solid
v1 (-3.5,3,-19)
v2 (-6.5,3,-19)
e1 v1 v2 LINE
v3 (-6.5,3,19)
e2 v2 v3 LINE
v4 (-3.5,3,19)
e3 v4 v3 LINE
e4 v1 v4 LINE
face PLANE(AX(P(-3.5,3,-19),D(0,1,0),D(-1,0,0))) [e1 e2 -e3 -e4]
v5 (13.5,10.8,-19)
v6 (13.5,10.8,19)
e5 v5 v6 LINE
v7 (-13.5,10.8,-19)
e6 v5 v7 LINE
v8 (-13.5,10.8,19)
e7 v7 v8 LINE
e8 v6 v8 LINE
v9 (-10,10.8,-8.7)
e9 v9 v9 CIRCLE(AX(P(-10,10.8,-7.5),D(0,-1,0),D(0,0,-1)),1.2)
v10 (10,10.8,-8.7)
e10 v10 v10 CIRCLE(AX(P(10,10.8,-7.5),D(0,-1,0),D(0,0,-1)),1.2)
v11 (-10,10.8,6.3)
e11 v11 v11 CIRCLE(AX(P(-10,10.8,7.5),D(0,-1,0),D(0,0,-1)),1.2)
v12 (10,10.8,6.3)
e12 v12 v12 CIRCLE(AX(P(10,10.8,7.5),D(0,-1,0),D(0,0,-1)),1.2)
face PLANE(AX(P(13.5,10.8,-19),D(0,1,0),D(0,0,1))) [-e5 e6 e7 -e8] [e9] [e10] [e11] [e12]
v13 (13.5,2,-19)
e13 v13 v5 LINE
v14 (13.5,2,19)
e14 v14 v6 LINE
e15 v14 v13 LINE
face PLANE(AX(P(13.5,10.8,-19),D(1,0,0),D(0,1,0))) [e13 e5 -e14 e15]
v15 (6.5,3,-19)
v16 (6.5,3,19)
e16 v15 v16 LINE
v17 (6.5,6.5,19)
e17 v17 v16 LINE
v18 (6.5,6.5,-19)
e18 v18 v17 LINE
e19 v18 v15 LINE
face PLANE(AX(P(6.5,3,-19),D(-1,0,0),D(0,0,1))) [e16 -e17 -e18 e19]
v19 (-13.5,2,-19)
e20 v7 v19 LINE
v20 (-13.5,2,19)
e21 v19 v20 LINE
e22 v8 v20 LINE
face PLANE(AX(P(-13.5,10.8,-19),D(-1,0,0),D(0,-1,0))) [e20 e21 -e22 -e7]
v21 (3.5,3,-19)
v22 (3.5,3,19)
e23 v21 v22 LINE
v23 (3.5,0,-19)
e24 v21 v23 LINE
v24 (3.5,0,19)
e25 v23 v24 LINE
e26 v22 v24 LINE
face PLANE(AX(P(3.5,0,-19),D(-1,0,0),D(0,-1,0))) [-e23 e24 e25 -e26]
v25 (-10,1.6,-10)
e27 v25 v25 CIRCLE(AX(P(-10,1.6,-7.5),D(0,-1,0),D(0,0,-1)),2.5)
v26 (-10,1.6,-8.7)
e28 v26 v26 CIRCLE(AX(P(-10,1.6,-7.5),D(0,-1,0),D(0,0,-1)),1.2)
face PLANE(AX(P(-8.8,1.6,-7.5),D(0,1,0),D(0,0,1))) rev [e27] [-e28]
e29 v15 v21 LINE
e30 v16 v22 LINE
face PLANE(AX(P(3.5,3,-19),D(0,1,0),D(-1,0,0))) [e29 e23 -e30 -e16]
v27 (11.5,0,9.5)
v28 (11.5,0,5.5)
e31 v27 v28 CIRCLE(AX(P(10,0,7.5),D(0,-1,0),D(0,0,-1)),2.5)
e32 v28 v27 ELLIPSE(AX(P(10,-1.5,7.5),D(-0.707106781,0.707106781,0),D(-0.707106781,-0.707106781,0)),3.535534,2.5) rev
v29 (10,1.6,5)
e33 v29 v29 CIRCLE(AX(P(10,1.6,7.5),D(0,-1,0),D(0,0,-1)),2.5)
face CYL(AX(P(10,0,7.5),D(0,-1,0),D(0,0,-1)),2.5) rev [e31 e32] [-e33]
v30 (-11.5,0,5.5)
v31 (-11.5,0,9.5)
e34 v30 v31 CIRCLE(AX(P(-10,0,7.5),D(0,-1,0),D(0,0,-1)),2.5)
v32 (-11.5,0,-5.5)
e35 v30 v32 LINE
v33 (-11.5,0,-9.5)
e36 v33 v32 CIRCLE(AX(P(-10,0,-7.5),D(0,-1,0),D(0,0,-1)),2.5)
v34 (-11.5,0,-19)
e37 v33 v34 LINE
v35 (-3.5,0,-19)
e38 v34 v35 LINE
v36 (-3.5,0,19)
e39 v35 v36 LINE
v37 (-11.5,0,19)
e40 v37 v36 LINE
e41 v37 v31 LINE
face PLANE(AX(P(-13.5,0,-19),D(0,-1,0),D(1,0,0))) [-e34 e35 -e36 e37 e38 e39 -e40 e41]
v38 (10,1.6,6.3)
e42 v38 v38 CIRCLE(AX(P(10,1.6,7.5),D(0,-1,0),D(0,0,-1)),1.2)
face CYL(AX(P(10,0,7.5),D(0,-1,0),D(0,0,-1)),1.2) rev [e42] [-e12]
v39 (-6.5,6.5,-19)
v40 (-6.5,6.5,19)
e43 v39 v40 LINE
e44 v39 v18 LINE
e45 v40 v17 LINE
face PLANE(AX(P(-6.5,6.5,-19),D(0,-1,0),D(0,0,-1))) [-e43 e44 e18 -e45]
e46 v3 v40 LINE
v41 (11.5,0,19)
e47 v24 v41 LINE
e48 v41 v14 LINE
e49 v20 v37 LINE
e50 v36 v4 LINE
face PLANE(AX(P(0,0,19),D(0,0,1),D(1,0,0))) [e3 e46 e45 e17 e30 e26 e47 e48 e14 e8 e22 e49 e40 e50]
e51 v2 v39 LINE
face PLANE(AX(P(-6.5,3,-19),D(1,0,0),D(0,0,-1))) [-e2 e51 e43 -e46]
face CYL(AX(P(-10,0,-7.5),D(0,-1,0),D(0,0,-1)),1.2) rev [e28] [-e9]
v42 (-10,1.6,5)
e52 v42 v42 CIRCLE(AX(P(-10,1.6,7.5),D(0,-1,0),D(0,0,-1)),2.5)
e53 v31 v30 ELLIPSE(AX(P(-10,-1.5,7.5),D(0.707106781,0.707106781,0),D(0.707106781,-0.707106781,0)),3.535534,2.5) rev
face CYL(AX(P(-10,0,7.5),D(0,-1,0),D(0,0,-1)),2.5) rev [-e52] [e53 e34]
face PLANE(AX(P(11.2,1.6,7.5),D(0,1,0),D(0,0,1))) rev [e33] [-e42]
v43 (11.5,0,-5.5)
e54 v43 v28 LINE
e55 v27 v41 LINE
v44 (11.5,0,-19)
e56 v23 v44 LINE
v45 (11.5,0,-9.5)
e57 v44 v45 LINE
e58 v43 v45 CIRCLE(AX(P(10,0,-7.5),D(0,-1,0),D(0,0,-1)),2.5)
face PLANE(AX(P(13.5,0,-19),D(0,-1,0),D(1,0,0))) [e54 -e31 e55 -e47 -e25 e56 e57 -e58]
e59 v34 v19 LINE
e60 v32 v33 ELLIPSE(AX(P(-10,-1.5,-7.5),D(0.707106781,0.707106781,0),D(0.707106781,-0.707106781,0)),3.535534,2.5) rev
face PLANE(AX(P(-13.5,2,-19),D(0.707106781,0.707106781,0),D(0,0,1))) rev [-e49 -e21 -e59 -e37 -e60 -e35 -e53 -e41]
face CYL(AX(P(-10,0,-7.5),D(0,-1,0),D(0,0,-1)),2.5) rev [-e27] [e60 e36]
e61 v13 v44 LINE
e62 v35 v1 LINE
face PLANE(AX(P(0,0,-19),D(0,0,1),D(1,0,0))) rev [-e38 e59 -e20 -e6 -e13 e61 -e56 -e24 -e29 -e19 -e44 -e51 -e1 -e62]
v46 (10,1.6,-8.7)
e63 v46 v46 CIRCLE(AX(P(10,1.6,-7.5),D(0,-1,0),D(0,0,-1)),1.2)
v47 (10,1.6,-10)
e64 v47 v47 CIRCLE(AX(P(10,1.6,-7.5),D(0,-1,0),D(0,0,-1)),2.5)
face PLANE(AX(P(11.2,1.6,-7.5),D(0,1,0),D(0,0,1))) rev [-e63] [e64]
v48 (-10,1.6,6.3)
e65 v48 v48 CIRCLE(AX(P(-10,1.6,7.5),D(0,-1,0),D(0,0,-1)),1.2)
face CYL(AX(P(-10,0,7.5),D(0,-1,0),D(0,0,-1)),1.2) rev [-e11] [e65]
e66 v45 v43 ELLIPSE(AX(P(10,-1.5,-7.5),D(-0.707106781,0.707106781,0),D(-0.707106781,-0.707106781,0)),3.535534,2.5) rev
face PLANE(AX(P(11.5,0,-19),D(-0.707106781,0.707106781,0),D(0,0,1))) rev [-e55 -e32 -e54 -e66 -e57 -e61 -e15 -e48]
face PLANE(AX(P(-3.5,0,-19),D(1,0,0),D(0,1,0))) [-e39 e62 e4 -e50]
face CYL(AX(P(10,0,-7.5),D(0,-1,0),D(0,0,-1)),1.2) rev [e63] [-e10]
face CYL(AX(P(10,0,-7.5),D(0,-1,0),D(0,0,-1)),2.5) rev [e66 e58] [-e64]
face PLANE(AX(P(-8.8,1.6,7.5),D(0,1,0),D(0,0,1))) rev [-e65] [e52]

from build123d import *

# Parameters (mm, degrees)
AUFSATZ_LINEAR_AUSTRAGEN1_DEPTH                      = 19
AUFSATZ_LINEAR_AUSTRAGEN1_DEPTH_BACK                 = 19
STIRNSENKUNG_F_R_M2_FLACHKOPFSCHRAUBE_MI_D           = 2.4
STIRNSENKUNG_F_R_M2_FLACHKOPFSCHRAUBE_MI_CBORE_D     = 5
STIRNSENKUNG_F_R_M2_FLACHKOPFSCHRAUBE_MI_CBORE_DEPTH = 1.6
FASE1_SIZE                                           = 2


with BuildPart() as part:
    # Skizze1 → Aufsatz-Linear austragen1 (new, two sides: drawn at the far end of the back side and taken through both)
    with BuildSketch(Plane.XY.offset(-AUFSATZ_LINEAR_AUSTRAGEN1_DEPTH_BACK)):
        Polygon((-3.5, 0), (-3.5, 3), (-6.5, 3), (-6.5, 6.5), (6.5, 6.5), (6.5, 3), (3.5, 3), (3.5, 0), (13.5, 0), (13.5, 10.8), (-13.5, 10.8), (-13.5, 0), align=None)
    extrude(amount=AUFSATZ_LINEAR_AUSTRAGEN1_DEPTH + AUFSATZ_LINEAR_AUSTRAGEN1_DEPTH_BACK)

    # Stirnsenkung für M2 Flachkopfschraube mit Schlitz1 (through all)
    with Locations(Plane(origin=(0, 0, 0), x_dir=(-1, 0, 0), z_dir=(0, -1, 0))):
        with Locations((-10, -7.5), (-10, 7.5), (10, -7.5), (10, 7.5)):
            CounterBoreHole(STIRNSENKUNG_F_R_M2_FLACHKOPFSCHRAUBE_MI_D / 2, STIRNSENKUNG_F_R_M2_FLACHKOPFSCHRAUBE_MI_CBORE_D / 2, STIRNSENKUNG_F_R_M2_FLACHKOPFSCHRAUBE_MI_CBORE_DEPTH)

    # Fase1
    # the kernel refuses this chamfer: 2 mm, written as the material it takes off along each edge
    with BuildSketch(Plane(origin=(-13.5, 0, 24.143365976), x_dir=(0.9996219169112968, -0.027495876610586598, 0), z_dir=(0, 0, -1)), Plane(origin=(13.5, 0, -24.143365976), x_dir=(-0.9996219169112968, -0.027495876610586608, 0), z_dir=(0, 0, 1))) as fase1_piece_1:
        Polygon((FASE1_SIZE * 0.999621916911, -FASE1_SIZE * 0.0274958766106), (-FASE1_SIZE * 0.0274958766106, -FASE1_SIZE * 0.999621916911), (0, 0), align=None)
    extrude(amount=48.286731952, mode=Mode.SUBTRACT)


solid = part.part
